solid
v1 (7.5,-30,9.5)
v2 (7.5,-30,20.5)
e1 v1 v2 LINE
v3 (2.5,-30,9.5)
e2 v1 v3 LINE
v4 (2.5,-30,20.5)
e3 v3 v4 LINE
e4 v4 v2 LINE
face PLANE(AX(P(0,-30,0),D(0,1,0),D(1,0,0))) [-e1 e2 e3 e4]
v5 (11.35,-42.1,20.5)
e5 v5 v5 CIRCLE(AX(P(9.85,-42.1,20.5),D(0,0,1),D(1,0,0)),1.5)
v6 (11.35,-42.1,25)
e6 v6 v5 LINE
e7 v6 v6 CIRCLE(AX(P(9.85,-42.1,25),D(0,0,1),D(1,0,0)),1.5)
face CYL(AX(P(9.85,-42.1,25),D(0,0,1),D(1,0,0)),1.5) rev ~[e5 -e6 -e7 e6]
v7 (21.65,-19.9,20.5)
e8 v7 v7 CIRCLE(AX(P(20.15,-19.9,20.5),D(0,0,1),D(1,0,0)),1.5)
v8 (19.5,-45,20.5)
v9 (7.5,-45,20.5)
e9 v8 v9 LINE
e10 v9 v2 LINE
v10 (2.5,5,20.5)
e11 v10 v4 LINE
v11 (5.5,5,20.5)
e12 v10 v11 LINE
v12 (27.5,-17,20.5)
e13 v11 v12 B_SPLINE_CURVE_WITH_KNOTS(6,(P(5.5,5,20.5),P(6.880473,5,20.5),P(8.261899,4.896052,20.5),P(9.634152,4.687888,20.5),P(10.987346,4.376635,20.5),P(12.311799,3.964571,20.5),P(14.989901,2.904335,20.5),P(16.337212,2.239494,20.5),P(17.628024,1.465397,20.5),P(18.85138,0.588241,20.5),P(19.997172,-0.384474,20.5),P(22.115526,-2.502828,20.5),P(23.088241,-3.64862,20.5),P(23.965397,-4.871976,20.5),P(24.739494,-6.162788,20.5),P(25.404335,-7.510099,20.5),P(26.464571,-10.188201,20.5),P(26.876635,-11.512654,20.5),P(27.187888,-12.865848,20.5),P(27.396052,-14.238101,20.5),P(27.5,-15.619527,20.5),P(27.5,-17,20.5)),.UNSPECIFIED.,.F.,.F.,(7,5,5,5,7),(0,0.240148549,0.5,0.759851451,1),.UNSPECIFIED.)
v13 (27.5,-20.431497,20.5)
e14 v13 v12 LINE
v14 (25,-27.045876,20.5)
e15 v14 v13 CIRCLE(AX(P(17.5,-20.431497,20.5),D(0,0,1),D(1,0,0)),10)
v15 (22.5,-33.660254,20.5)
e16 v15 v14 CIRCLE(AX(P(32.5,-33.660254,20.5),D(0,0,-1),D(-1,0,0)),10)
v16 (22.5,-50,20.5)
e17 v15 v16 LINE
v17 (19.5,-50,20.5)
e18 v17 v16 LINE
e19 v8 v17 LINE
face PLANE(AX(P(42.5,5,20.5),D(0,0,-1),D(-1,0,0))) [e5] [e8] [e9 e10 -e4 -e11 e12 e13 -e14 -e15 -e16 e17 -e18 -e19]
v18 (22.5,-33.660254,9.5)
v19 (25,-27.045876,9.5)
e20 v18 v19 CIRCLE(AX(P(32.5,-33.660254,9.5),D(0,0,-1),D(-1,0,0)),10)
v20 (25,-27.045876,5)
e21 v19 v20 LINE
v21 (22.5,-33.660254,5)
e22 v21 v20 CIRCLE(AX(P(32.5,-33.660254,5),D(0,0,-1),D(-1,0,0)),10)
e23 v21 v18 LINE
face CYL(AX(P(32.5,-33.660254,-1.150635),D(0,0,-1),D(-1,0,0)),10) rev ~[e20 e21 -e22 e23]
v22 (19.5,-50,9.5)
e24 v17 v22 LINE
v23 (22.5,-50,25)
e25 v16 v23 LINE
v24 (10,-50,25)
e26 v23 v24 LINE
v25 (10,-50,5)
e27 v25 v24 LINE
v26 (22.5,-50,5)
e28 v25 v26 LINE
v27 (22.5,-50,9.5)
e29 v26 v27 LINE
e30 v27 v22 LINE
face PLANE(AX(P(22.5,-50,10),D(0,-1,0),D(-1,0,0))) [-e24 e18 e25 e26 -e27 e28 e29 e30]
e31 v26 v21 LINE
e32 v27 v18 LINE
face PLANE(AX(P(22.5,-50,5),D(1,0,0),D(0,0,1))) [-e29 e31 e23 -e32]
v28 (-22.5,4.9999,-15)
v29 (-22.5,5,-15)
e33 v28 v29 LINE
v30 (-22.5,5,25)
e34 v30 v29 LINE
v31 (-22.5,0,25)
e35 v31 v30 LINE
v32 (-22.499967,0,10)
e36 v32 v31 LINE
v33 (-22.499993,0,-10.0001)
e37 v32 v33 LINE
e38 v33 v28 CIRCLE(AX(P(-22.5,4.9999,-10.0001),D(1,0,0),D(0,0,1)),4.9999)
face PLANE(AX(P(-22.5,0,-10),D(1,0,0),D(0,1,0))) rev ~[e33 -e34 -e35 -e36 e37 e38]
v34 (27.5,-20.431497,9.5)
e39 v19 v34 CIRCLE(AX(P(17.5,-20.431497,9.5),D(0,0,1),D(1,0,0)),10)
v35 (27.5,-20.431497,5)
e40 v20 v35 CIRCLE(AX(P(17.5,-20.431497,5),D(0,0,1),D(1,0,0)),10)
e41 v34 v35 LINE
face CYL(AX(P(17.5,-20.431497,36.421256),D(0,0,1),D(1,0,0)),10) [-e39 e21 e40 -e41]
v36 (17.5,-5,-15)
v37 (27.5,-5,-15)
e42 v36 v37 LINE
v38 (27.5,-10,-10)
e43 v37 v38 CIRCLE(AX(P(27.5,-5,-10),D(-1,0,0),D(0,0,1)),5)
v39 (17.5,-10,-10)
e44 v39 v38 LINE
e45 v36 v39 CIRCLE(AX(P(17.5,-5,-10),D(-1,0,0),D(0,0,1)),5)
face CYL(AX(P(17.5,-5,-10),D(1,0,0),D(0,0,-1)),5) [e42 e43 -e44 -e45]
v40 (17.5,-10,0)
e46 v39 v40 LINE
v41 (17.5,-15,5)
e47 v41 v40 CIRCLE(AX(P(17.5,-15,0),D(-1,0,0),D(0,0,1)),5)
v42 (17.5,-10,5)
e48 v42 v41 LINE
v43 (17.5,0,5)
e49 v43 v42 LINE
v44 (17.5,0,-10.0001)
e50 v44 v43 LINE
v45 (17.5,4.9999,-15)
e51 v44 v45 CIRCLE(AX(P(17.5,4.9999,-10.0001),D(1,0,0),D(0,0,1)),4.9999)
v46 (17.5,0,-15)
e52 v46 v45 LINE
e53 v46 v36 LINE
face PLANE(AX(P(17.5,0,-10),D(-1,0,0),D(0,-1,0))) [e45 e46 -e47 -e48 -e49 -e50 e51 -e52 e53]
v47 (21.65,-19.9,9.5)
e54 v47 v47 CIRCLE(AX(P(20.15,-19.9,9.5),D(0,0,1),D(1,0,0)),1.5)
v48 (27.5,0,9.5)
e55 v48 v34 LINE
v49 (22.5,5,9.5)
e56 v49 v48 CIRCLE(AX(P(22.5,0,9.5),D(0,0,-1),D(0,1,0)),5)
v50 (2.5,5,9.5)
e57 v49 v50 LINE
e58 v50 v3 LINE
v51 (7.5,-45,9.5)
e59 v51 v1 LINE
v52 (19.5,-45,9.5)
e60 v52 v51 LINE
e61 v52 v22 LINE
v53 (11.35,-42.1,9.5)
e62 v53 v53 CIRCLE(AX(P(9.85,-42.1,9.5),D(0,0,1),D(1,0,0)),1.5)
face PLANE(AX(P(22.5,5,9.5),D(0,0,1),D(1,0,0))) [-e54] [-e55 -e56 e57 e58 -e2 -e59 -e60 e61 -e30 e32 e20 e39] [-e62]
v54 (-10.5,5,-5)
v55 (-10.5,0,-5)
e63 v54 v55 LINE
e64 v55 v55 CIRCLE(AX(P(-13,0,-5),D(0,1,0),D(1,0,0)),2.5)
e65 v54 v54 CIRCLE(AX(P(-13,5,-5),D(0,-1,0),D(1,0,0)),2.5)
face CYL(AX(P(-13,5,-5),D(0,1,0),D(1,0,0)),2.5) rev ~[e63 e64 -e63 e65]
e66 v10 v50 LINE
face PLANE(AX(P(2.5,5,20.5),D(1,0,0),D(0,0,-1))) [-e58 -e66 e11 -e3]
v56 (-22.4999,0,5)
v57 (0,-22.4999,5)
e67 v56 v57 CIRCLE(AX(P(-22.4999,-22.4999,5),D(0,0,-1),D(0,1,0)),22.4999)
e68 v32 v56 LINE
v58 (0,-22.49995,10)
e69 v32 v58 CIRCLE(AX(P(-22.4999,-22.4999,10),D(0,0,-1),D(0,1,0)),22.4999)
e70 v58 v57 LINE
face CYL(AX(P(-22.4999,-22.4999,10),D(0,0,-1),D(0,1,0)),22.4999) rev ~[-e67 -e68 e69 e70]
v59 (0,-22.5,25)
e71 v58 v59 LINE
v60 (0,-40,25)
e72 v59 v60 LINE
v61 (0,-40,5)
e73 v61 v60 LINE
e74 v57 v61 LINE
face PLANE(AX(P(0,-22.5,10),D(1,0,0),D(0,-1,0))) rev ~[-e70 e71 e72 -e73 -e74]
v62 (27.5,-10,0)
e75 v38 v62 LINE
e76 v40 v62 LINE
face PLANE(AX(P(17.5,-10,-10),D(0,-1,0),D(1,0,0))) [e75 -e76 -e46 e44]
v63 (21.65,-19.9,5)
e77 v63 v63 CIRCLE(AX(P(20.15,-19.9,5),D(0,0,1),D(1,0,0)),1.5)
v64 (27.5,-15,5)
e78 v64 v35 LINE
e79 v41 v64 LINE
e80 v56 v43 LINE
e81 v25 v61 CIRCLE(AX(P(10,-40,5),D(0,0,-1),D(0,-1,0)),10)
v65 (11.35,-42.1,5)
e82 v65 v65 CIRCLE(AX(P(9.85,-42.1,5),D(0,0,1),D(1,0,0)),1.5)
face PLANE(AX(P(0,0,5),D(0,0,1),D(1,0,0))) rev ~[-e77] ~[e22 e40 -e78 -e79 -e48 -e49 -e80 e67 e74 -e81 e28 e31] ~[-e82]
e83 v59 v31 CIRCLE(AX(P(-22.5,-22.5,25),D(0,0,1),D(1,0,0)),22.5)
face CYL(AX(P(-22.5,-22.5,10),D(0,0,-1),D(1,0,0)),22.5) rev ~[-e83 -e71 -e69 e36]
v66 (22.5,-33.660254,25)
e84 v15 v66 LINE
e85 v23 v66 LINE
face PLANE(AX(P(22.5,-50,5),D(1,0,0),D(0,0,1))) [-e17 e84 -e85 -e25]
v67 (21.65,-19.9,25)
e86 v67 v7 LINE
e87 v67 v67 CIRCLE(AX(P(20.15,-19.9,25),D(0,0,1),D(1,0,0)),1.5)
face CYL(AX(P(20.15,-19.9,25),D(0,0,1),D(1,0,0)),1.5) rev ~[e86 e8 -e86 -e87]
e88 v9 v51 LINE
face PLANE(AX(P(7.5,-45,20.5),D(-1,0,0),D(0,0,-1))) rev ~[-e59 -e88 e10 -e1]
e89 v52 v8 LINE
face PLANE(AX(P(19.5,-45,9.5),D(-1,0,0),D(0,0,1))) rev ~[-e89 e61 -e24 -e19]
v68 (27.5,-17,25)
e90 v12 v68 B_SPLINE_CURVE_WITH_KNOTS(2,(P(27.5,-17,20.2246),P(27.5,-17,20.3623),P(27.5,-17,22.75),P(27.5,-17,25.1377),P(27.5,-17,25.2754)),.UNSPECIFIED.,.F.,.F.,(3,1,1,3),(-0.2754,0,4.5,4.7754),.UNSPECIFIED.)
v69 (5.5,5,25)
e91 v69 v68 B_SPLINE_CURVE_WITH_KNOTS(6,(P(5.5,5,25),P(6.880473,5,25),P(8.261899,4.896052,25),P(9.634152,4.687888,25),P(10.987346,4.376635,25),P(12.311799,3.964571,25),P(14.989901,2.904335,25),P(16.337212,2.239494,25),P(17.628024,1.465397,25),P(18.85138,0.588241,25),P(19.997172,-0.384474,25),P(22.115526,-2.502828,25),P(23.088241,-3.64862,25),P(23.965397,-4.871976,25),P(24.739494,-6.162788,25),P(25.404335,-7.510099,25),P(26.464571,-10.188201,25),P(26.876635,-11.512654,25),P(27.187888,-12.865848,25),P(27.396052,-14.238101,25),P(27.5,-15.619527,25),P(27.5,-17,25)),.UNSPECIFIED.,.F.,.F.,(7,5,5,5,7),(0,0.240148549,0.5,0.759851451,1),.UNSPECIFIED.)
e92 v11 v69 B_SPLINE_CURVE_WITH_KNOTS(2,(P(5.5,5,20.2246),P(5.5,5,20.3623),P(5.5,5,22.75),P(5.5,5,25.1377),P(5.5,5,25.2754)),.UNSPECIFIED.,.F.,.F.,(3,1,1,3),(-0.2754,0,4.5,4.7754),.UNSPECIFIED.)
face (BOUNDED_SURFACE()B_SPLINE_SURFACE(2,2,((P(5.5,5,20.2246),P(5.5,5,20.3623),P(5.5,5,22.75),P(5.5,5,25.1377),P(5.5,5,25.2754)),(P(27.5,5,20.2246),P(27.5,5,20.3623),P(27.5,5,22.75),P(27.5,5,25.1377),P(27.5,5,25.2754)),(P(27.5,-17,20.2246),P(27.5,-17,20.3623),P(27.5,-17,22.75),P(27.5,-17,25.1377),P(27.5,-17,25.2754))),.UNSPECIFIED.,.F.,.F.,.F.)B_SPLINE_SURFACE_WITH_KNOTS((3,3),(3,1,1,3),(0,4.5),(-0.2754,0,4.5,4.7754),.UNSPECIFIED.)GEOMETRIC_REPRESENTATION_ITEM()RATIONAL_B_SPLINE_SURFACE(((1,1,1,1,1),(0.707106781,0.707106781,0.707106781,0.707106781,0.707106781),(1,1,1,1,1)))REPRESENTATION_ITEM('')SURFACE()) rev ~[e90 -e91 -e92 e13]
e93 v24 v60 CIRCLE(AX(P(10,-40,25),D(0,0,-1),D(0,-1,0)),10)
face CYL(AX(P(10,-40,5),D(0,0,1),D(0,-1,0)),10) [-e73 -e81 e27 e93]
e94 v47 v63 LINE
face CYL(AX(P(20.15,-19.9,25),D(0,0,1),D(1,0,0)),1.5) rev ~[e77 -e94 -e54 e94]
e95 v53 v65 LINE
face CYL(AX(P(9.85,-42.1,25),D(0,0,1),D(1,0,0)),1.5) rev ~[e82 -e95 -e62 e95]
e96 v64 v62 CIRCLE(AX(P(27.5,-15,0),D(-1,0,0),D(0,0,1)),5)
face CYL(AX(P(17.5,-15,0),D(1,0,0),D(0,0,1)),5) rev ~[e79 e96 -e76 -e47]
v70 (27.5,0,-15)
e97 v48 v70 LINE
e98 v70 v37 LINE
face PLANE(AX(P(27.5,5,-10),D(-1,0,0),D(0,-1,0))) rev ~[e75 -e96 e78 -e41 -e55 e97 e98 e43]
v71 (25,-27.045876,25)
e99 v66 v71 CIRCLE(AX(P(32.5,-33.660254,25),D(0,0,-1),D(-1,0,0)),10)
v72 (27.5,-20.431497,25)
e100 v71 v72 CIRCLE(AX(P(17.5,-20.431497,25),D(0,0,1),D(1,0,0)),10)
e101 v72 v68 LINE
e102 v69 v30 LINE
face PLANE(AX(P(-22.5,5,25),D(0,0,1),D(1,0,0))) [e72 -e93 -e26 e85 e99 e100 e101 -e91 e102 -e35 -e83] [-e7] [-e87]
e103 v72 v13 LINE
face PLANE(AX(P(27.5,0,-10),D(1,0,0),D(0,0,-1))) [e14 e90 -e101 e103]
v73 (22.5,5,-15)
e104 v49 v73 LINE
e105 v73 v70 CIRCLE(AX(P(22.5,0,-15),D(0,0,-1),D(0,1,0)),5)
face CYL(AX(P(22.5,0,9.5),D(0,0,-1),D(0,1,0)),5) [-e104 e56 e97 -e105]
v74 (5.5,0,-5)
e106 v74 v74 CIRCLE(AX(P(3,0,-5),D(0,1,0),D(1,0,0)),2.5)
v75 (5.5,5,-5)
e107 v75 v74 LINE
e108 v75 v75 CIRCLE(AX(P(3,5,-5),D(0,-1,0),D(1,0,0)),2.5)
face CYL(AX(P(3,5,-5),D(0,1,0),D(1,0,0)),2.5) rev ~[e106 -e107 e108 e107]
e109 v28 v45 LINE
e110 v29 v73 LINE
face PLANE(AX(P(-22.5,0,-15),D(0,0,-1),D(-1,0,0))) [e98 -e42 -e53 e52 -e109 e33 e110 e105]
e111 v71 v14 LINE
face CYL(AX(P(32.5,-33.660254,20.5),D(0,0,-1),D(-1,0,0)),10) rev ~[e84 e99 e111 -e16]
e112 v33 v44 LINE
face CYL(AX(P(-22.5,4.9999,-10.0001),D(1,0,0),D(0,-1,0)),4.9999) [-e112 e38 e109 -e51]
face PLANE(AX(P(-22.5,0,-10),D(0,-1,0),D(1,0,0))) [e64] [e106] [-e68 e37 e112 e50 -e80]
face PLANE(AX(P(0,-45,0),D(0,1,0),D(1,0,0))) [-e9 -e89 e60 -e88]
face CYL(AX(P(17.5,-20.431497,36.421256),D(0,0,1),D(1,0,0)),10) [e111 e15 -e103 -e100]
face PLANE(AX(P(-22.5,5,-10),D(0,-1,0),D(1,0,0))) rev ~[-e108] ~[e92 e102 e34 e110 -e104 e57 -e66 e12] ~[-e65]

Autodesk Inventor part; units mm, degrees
ref_plane "YZ Plane" through (0, 0, 0) normal (1, 0, 0) x (0, 1, 0)
ref_plane "XZ Plane" through (0, 0, 0) normal (0, 1, 0) x (-1, 0, 0)
ref_plane "XY Plane" through (0, 0, 0) normal (0, 0, 1) x (1, 0, 0)
sketch "Sketch1" plane through (0, 0, 0) normal (0, 1, 0) x (-1, 0, 0)
  line L0 (22.5, 10) -> (-22.5, 10)
  line L1 (-22.5, 10) -> (-22.5, -10)
  line L2 (-22.5, -10) -> (22.5, -10)
  line L3 (22.5, -10) -> (22.5, 10)
  line L4 (22.5, 10) -> (-22.5, -10) construction
  line L5 (-22.5, 10) -> (22.5, -10) construction
  point P0 (0, 0)
  dimension "d0" = 45
  dimension "d1" = 20
extrude "Extrusion1" add sketch "Sketch1" along normal blind 5
sketch "Sketch2" plane through (0, 0, 0) normal (0, -1, 0) x (1, 0, 0)
  line L0 (22.5, 10) -> (22.5, -10) projected
  line L1 (22.5, 10) -> (0, 10)
  line L2 (0, 10) -> (0, 5)
  line L3 (0, 5) -> (22.5, 5)
  line L4 (22.5, 5) -> (22.5, 10)
  point P0 (0, 0)
  dimension "d4" = 22.5
  dimension "d5" = 5
extrude "Extrusion2" add sketch "Sketch2" along normal blind 50
fillet "Fillet1" radius 22.5 1 edges at (0, 0, 7.5)
sketch "Sketch3" plane through (-22.5, 5, 10) normal (0, 0, 1) x (1, 0, 0)
  arc A0 (22.5, -27.5) -> (0, -5) centre (0, -27.5) ccw projected
  line L0 (22.5, -27.5) -> (22.5, -55) projected
  line L1 (45, -55) -> (22.5, -55) projected
  line L2 (45, 0) -> (45, -55) projected
  line L3 (0, 0) -> (45, 0) projected
  line L4 (0, -5) -> (0, 0) projected
  point P0 (22.5, -5)
extrude "Extrusion3" add sketch "Sketch3" along normal blind 15
sketch "Sketch7" plane through (0, 5, 0) normal (0, 1, 0) x (1, 0, 0)
  line L0 (22.5, -5) -> (-22.5, -5) projected
  line L1 (22.5, 10) -> (22.5, -25) projected
  line L2 (22.5, -5) -> (22.5, -25)
  line L3 (42.5, -20.5) -> (2.5, -20.5)
  line L4 (2.5, -20.5) -> (2.5, -9.5)
  line L5 (2.5, -9.5) -> (42.5, -9.5)
  line L6 (42.5, -9.5) -> (42.5, -20.5)
  line L7 (42.5, -20.5) -> (2.5, -9.5) construction
  line L8 (2.5, -20.5) -> (42.5, -9.5) construction
  point P0 (0, 0)
  point P1 (22.5, -15)
  dimension "d16" = 40
  dimension "d17" = 11
extrude "Extrusion5" cut sketch "Sketch7" against normal blind 50
sketch "Sketch8" plane through (0, -45, 0) normal (0, 1, 0) x (1, 0, 0)
  line L0 (22.5, -5) -> (22.5, -25) projected
  line L1 (22.5, -15) -> (7.5, -15)
  line L2 (22.5, -15) -> (37.5, -15) construction
  line L3 (2.5, -20.5) -> (12.5, -20.5)
  line L4 (12.5, -20.5) -> (12.5, -9.5)
  line L5 (12.5, -9.5) -> (2.5, -9.5)
  line L6 (2.5, -9.5) -> (2.5, -20.5)
  line L7 (2.5, -20.5) -> (12.5, -9.5) construction
  line L8 (12.5, -20.5) -> (2.5, -9.5) construction
  line L9 (7.5, -20.5) -> (7.5, -9.5)
  point P0 (0, 0)
  dimension "d20" = 15
  dimension "d21" = 180
  dimension "d22" = 10
  dimension "d23" = 11
extrude "Extrusion6" add sketch "Sketch8" along normal blind 15 contours L9 L3 L6 L5
sketch "Sketch9" plane through (0, -45, 0) normal (0, 1, 0) x (1, 0, 0)
  line L0 (7.5, -9.5) -> (22.5, -9.5) projected
  line L1 (22.5, -9.5) -> (19.5, -9.5)
  line L2 (19.5, -9.5) -> (19.5, -20.5)
  line L3 (19.5, -20.5) -> (22.5, -20.5)
  line L4 (22.5, -20.5) -> (22.5, -9.5)
  point P0 (0, 0)
  dimension "d26" = 3
  dimension "d27" = 11
extrude "Extrusion7" cut sketch "Sketch9" against normal blind 15
fillet "Fillet2" radius 10 1 edges at (0, -50, 15)
sketch "Sketch10" plane through (-22.5, 5, 25) normal (0, 0, 1) x (1, 0, 0)
  circle A0 centre (32.35, -47.1) radius 1.5 projected
  circle A1 centre (42.65, -24.9) radius 1.5 projected
  point P0 (22.5, -5)
extrude "Extrusion8" cut sketch "Sketch10" against normal blind 20
sketch "Sketch11" plane through (22.5, 0, -10) normal (1, 0, 0) x (0, 0, -1)
  line L0 (-19.5, 5) -> (-19.5, -50) projected
  line L1 (-15, -50) -> (-19.5, -50) projected
  line L2 (-15, 0) -> (-15, -50) projected
  line L3 (-15, 0) -> (0, 0) projected
  line L4 (0, 0) -> (0, 5) projected
  line L5 (0, 5) -> (-19.5, 5) projected
  line L6 (-30.5, -50) -> (-30.5, 5) projected
  line L7 (-30.5, 5) -> (-35, 5) projected
  line L8 (-35, -50) -> (-35, 5) projected
  line L9 (-30.5, -50) -> (-35, -50) projected
  point P0 (-10, 0)
extrude "Extrusion9" add sketch "Sketch11" along normal blind 5
sketch "Sketch12" plane through (0, -50, 0) normal (0, -1, 0) x (1, 0, 0)
  line L0 (10, 5) -> (27.5, 5) projected
  line L1 (27.5, 5) -> (22.5, 5)
  line L2 (22.5, 5) -> (22.5, 25)
  line L3 (22.5, 25) -> (27.5, 25)
  line L4 (27.5, 25) -> (27.5, 5)
  point P0 (0, 0)
  dimension "d35" = 5
  dimension "d36" = 20
extrude "Extrusion10" cut sketch "Sketch12" against normal blind 25
fillet "Fillet3" radius 10 4 edges at (27.5, -25, 7.25) (22.5, -25, 7.25) (27.5, -25, 22.75) (22.5, -25, 22.75)
sketch "Sketch13" plane through (0, 0, 0) normal (0, -1, 0) x (1, 0, 0)
  line L0 (27.5, -10) -> (17.5, -10)
  line L1 (17.5, -10) -> (17.5, 5)
  line L2 (17.5, 5) -> (27.5, 5)
  line L3 (27.5, 5) -> (27.5, -10)
  point P0 (0, 0)
  dimension "d40" = 10
  dimension "d41" = 15
extrude "Extrusion11" add sketch "Sketch13" along normal blind 10
sketch "Sketch14" plane through (0, 5, 0) normal (0, 1, 0) x (1, 0, 0)
  line L0 (-22.5, 10) -> (27.5, 10) projected
  line L1 (-22.5, 10) -> (-13, 10)
  line L2 (-13, 10) -> (-13, 5)
  line L3 (-13, 5) -> (3, 5)
  circle A0 centre (-13, 5) radius 2.5
  circle A1 centre (3, 5) radius 2.5
  point P0 (0, 0)
  dimension "d45" = 9.5
  dimension "d46" = 5
  dimension "d47" = 16
  dimension "d48" = 90
  dimension "d49" = 5
  dimension "d50" = 5
extrude "Extrusion12" cut sketch "Sketch14" against normal blind 10
sketch "Sketch15" plane through (-22.5, 0, -10) normal (0, 0, -1) x (-1, 0, 0)
  line L0 (0, 0) -> (-40, 0) projected
  line L1 (0, 0) -> (0, 5) projected
  line L2 (0, 5) -> (-50, 5) projected
  line L3 (-50, 5) -> (-50, -10) projected
  line L4 (-40, -10) -> (-50, -10) projected
  line L5 (-40, 0) -> (-40, -10) projected
  point P0 (-22.5, 0)
extrude "Extrusion13" add sketch "Sketch15" along normal blind 5
fillet "Fillet5" radius 5 1 edges at (-2.5, 0, -15)
fillet "Fillet6" radius 5 2 edges at (22.5, -10, 5) (22.5, -10, -15)
fillet "Fillet7" radius 22 1 edges at (27.5, 5, 22.75)
fillet "Fillet8" radius 5 1 edges at (27.5, 5, -2.75)
properties part number "SOPORTE_FDC"
